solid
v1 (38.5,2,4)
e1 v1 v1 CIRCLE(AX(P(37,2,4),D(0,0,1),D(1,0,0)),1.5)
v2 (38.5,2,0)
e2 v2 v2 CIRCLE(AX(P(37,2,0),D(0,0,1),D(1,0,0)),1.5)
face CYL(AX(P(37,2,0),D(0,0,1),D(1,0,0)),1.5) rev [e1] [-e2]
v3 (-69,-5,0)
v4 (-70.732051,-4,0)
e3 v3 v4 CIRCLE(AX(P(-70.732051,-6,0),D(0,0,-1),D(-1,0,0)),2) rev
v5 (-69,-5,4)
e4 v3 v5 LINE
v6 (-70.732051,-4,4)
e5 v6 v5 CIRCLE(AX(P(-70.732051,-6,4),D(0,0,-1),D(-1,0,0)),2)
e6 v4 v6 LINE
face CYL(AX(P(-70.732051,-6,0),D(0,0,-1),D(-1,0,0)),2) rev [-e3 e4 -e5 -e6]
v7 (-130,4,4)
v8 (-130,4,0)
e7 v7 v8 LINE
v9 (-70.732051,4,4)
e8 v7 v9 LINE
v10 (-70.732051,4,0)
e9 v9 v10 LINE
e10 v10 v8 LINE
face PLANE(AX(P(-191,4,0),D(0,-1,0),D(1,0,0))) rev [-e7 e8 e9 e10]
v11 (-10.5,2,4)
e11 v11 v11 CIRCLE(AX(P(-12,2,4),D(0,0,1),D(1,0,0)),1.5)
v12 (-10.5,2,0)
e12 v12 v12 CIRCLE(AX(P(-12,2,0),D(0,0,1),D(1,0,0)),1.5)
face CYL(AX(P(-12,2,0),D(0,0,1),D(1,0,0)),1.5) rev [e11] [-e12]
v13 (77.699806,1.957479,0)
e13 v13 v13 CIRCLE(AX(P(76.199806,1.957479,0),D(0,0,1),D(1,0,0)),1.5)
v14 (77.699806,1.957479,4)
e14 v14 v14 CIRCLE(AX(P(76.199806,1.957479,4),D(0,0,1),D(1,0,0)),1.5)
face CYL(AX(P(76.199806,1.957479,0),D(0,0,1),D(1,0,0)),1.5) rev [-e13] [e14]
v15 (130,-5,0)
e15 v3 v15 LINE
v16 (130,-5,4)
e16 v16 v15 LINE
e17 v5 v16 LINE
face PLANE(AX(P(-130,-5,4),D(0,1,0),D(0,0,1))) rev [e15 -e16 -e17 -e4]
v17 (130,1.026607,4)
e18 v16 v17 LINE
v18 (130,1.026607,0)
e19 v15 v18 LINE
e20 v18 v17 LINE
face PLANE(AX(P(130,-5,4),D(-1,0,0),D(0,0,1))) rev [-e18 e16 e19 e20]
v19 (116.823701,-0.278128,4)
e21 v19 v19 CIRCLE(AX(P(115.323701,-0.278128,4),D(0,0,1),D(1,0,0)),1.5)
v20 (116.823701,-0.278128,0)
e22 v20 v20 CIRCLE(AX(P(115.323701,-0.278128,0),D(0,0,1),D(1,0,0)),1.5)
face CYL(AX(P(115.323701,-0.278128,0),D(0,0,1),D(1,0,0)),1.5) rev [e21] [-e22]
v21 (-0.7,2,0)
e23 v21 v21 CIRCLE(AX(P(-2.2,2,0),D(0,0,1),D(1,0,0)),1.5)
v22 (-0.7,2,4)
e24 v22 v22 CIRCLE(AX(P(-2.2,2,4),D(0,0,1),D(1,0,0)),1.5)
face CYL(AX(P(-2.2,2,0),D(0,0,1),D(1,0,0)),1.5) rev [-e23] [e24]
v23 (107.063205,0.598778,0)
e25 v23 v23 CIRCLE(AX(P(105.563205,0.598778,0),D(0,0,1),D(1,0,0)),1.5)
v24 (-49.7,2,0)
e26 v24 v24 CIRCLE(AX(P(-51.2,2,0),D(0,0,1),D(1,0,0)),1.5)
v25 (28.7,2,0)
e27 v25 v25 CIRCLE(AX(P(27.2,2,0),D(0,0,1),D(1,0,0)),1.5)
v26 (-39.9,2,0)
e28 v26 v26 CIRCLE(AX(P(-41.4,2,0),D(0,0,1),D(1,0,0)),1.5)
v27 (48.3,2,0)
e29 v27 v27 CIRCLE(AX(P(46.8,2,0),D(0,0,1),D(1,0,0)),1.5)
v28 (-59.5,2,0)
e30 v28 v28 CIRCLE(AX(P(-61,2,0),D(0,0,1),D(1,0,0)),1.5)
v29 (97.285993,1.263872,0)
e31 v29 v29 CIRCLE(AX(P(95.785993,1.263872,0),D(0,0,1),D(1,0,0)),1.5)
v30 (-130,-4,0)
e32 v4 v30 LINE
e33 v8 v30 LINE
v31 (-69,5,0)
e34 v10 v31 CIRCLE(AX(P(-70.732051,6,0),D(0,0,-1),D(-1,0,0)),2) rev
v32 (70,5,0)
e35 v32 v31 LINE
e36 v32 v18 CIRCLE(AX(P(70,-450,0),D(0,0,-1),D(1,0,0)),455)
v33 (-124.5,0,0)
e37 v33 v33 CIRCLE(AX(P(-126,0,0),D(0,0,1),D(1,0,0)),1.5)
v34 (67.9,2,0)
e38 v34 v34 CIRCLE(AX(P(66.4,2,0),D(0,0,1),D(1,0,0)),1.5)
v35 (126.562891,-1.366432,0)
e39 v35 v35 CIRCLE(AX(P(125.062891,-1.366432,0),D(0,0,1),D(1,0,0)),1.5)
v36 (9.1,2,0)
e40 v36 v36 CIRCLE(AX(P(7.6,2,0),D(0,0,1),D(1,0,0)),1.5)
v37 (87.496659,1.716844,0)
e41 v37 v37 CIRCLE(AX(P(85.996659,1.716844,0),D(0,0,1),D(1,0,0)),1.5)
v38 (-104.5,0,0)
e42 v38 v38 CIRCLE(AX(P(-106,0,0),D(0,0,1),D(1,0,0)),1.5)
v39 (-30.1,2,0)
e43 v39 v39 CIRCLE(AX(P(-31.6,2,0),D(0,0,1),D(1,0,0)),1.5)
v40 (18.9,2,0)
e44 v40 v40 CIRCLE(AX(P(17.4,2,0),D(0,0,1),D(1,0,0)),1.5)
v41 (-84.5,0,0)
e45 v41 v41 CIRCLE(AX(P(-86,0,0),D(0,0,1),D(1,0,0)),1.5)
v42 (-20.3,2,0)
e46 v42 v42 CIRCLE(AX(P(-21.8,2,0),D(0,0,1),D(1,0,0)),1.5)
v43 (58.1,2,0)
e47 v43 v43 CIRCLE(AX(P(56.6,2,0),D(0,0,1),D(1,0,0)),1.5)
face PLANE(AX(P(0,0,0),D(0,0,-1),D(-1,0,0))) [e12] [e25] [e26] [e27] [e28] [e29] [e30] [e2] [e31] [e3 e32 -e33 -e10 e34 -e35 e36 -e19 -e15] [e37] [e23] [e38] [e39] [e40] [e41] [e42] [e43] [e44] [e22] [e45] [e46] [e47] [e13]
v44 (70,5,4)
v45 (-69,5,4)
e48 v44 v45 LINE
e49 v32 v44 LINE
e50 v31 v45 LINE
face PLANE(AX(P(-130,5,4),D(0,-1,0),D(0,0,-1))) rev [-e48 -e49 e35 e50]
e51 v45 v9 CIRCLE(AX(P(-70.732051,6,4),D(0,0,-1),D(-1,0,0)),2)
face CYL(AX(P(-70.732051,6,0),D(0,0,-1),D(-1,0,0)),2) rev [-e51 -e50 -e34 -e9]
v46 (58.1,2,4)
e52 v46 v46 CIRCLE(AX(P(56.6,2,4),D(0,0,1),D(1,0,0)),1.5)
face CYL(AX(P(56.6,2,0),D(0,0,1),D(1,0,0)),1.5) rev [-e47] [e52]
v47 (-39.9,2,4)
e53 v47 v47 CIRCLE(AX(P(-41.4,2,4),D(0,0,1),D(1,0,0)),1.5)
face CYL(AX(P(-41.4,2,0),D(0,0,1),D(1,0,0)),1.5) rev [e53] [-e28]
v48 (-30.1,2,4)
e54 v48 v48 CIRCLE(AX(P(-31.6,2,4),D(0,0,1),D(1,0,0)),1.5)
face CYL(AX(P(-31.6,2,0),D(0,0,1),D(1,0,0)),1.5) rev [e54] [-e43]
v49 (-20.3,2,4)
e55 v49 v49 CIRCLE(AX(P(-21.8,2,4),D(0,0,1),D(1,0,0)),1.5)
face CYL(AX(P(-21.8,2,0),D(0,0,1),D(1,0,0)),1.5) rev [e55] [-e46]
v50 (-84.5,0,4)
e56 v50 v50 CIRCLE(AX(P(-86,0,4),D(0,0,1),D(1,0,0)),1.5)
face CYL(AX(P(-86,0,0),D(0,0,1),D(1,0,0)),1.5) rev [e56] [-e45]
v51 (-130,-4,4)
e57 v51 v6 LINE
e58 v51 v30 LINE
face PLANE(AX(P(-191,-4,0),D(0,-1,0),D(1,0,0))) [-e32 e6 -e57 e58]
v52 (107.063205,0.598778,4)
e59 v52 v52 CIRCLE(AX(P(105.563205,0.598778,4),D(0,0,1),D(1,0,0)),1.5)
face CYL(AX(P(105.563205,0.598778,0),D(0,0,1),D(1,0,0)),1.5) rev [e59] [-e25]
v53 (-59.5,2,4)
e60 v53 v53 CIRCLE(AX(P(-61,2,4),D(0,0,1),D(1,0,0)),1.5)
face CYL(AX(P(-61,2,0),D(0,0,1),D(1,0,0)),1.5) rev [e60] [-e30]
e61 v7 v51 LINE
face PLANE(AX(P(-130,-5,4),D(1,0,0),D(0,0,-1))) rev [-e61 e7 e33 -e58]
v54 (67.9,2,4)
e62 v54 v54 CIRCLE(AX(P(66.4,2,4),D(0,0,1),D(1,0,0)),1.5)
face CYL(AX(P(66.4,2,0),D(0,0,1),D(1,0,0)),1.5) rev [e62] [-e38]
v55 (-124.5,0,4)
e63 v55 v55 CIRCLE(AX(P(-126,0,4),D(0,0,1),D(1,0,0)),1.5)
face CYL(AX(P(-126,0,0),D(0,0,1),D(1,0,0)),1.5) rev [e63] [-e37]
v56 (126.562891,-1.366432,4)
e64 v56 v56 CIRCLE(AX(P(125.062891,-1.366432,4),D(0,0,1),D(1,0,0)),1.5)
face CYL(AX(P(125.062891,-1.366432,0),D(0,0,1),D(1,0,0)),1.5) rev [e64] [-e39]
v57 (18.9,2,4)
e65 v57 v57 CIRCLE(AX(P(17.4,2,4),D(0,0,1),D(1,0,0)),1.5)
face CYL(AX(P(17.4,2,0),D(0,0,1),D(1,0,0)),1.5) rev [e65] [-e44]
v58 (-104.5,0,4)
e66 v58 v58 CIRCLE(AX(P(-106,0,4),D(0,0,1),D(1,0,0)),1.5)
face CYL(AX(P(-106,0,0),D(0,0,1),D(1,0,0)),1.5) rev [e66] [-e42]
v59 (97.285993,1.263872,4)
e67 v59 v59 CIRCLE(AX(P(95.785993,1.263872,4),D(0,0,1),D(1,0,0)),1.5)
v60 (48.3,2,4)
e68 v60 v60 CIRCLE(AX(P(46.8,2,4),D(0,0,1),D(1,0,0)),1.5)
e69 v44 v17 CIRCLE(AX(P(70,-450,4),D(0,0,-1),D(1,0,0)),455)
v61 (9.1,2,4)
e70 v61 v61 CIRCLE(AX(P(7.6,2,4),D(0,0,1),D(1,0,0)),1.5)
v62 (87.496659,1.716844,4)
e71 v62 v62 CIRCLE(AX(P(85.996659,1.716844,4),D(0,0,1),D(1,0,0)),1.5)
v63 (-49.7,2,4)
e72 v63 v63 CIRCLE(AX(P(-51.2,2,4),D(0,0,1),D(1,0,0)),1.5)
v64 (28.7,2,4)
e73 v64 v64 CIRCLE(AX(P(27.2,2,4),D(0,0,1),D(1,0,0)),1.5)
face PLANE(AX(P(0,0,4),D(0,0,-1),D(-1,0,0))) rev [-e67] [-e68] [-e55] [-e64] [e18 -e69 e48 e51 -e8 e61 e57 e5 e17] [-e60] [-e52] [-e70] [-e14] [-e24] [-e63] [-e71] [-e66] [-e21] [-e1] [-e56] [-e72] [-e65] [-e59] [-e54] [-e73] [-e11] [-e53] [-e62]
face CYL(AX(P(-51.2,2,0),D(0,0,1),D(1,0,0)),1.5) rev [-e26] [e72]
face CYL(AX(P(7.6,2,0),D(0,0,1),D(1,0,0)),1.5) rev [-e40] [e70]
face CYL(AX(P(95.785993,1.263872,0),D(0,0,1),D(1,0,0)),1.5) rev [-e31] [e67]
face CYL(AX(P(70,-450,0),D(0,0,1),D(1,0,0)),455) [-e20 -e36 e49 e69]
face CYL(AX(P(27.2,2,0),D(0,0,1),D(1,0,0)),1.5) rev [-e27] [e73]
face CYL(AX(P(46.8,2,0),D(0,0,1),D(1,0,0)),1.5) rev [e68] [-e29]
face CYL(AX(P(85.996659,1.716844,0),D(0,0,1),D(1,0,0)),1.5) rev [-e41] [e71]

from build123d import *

# Parameters (mm, degrees)
SKETCH_1_W                = 260
SKETCH_1_H                = 10
EXTRUDE_1_DEPTH           = 4
SKETCH_2_W                = 122
SKETCH_2_H                = 2
CUT_EXTRUDE_1_DEPTH       = 4
SKETCH_4_R                = 1.5
CUT_EXTRUDE_2_DEPTH       = 4
FILLET_1_R                = 2
SKETCH_7_R                = 1.5
CUT_EXTRUDE_3_DEPTH       = 4
PATTERN_CURVE_1_OUTLINE_R = 1.5
PATTERN_CURVE_1_DEPTH     = 4
CUT_EXTRUDE_4_DEPTH       = 4


# Read off the part's stored shape, not the designer's step: 曲线阵列1
with BuildPart() as part:
    # 草图1 → 凸台-拉伸1 (new body)
    with BuildSketch(Plane.XY):
        Rectangle(SKETCH_1_W, SKETCH_1_H)
    extrude(amount=EXTRUDE_1_DEPTH)

    # 草图2 → 切除-拉伸1 (cut)
    with BuildSketch(Plane.XY.offset(4)):
        with Locations((-130, 5)):
            Rectangle(SKETCH_2_W, SKETCH_2_H)
    cut_extrude_1 = extrude(amount=-CUT_EXTRUDE_1_DEPTH, mode=Mode.SUBTRACT)

    # 镜向1: 切除-拉伸1 across plane
    add(cut_extrude_1.mirror(Plane.ZX), mode=Mode.SUBTRACT)

    # 草图4 → 切除-拉伸2 (cut)
    with BuildSketch(Plane.XY.offset(4)):
        with Locations((-126, 0)):
            Circle(SKETCH_4_R)
        with Locations((-86, 0)):
            Circle(SKETCH_4_R)
        with Locations((-106, 0)):
            Circle(SKETCH_4_R)
    extrude(amount=-CUT_EXTRUDE_2_DEPTH, mode=Mode.SUBTRACT)

    # 圆角1
    # the kernel refuses this fillet: 2 mm, written as the material it adds along each edge
    with BuildSketch(Plane(origin=(-69, -4, 4), x_dir=(0, -1, 0), z_dir=(0, 0, -1))) as fillet_1_piece_1:
        with BuildLine():
            CenterArc((2, 1.732050808), FILLET_1_R, 180, 60)
            Line((0, 1.732050808), (-0.04, 1.732050808))
            Line((-0.04, 1.732050808), (-0.04, 0))
            Line((-0.04, 0), (0, -0.04))
            ThreePointArc((0, -0.04), (0.5, -0.04), (0.98, -0.034641016))
            Line((0.98, -0.034641016), (1, 0))
        make_face()
    extrude(amount=4)
    with BuildSketch(Plane(origin=(-69, 4, 4), x_dir=(-1, 0, 0), z_dir=(0, 0, -1))) as fillet_1_piece_2:
        with BuildLine():
            CenterArc((1.732050808, 2), FILLET_1_R, 210, 60)
            Line((0, 1), (-0.034641016, 0.98))
            ThreePointArc((-0.034641016, 0.98), (-0.04, 0.5), (-0.04, 0))
            Line((-0.04, 0), (0, -0.04))
            Line((0, -0.04), (1.732050808, -0.04))
            Line((1.732050808, -0.04), (1.732050808, 0))
        make_face()
    extrude(amount=4)

    # 草图7 → 切除-拉伸3 (cut)
    with BuildSketch(Plane.XY.offset(4)):
        with Locations((-61, 2)):
            Circle(SKETCH_7_R)
    extrude(amount=-CUT_EXTRUDE_3_DEPTH, mode=Mode.SUBTRACT)

    # 曲线阵列1 outline → 曲线阵列1 (cut)
    with BuildSketch(Plane.XY):
        with Locations((125.062891226, -1.366432364)):
            Circle(PATTERN_CURVE_1_OUTLINE_R)
        with Locations((115.323700734, -0.278128004)):
            Circle(PATTERN_CURVE_1_OUTLINE_R)
        with Locations((105.563205139, 0.598777673)):
            Circle(PATTERN_CURVE_1_OUTLINE_R)
        with Locations((95.785992512, 1.263872463)):
            Circle(PATTERN_CURVE_1_OUTLINE_R)
        with Locations((85.996658783, 1.716843728)):
            Circle(PATTERN_CURVE_1_OUTLINE_R)
        with Locations((76.199805579, 1.957478543)):
            Circle(PATTERN_CURVE_1_OUTLINE_R)
        with Locations((66.4, 2)):
            Circle(PATTERN_CURVE_1_OUTLINE_R)
        with Locations((56.6, 2)):
            Circle(PATTERN_CURVE_1_OUTLINE_R)
        with Locations((46.8, 2)):
            Circle(PATTERN_CURVE_1_OUTLINE_R)
        with Locations((37, 2)):
            Circle(PATTERN_CURVE_1_OUTLINE_R)
        with Locations((27.2, 2)):
            Circle(PATTERN_CURVE_1_OUTLINE_R)
        with Locations((17.4, 2)):
            Circle(PATTERN_CURVE_1_OUTLINE_R)
        with Locations((7.6, 2)):
            Circle(PATTERN_CURVE_1_OUTLINE_R)
        with Locations((-2.2, 2)):
            Circle(PATTERN_CURVE_1_OUTLINE_R)
        with Locations((-12, 2)):
            Circle(PATTERN_CURVE_1_OUTLINE_R)
        with Locations((-21.8, 2)):
            Circle(PATTERN_CURVE_1_OUTLINE_R)
        with Locations((-31.6, 2)):
            Circle(PATTERN_CURVE_1_OUTLINE_R)
        with Locations((-41.4, 2)):
            Circle(PATTERN_CURVE_1_OUTLINE_R)
        with Locations((-51.2, 2)):
            Circle(PATTERN_CURVE_1_OUTLINE_R)
    extrude(amount=PATTERN_CURVE_1_DEPTH, mode=Mode.SUBTRACT)

    # 草图8 → 切除-拉伸4 (cut)
    with BuildSketch(Plane.XY.offset(4)):
        with BuildLine():
            Line((70, 5), (130, 5))
            Line((130, 5), (130.398230088, 0.973451327))
            ThreePointArc((130.398230088, 0.973451327), (100.266149788, 3.992246825), (70, 5))
        make_face()
    extrude(amount=-CUT_EXTRUDE_4_DEPTH, mode=Mode.SUBTRACT)


solid = part.part
